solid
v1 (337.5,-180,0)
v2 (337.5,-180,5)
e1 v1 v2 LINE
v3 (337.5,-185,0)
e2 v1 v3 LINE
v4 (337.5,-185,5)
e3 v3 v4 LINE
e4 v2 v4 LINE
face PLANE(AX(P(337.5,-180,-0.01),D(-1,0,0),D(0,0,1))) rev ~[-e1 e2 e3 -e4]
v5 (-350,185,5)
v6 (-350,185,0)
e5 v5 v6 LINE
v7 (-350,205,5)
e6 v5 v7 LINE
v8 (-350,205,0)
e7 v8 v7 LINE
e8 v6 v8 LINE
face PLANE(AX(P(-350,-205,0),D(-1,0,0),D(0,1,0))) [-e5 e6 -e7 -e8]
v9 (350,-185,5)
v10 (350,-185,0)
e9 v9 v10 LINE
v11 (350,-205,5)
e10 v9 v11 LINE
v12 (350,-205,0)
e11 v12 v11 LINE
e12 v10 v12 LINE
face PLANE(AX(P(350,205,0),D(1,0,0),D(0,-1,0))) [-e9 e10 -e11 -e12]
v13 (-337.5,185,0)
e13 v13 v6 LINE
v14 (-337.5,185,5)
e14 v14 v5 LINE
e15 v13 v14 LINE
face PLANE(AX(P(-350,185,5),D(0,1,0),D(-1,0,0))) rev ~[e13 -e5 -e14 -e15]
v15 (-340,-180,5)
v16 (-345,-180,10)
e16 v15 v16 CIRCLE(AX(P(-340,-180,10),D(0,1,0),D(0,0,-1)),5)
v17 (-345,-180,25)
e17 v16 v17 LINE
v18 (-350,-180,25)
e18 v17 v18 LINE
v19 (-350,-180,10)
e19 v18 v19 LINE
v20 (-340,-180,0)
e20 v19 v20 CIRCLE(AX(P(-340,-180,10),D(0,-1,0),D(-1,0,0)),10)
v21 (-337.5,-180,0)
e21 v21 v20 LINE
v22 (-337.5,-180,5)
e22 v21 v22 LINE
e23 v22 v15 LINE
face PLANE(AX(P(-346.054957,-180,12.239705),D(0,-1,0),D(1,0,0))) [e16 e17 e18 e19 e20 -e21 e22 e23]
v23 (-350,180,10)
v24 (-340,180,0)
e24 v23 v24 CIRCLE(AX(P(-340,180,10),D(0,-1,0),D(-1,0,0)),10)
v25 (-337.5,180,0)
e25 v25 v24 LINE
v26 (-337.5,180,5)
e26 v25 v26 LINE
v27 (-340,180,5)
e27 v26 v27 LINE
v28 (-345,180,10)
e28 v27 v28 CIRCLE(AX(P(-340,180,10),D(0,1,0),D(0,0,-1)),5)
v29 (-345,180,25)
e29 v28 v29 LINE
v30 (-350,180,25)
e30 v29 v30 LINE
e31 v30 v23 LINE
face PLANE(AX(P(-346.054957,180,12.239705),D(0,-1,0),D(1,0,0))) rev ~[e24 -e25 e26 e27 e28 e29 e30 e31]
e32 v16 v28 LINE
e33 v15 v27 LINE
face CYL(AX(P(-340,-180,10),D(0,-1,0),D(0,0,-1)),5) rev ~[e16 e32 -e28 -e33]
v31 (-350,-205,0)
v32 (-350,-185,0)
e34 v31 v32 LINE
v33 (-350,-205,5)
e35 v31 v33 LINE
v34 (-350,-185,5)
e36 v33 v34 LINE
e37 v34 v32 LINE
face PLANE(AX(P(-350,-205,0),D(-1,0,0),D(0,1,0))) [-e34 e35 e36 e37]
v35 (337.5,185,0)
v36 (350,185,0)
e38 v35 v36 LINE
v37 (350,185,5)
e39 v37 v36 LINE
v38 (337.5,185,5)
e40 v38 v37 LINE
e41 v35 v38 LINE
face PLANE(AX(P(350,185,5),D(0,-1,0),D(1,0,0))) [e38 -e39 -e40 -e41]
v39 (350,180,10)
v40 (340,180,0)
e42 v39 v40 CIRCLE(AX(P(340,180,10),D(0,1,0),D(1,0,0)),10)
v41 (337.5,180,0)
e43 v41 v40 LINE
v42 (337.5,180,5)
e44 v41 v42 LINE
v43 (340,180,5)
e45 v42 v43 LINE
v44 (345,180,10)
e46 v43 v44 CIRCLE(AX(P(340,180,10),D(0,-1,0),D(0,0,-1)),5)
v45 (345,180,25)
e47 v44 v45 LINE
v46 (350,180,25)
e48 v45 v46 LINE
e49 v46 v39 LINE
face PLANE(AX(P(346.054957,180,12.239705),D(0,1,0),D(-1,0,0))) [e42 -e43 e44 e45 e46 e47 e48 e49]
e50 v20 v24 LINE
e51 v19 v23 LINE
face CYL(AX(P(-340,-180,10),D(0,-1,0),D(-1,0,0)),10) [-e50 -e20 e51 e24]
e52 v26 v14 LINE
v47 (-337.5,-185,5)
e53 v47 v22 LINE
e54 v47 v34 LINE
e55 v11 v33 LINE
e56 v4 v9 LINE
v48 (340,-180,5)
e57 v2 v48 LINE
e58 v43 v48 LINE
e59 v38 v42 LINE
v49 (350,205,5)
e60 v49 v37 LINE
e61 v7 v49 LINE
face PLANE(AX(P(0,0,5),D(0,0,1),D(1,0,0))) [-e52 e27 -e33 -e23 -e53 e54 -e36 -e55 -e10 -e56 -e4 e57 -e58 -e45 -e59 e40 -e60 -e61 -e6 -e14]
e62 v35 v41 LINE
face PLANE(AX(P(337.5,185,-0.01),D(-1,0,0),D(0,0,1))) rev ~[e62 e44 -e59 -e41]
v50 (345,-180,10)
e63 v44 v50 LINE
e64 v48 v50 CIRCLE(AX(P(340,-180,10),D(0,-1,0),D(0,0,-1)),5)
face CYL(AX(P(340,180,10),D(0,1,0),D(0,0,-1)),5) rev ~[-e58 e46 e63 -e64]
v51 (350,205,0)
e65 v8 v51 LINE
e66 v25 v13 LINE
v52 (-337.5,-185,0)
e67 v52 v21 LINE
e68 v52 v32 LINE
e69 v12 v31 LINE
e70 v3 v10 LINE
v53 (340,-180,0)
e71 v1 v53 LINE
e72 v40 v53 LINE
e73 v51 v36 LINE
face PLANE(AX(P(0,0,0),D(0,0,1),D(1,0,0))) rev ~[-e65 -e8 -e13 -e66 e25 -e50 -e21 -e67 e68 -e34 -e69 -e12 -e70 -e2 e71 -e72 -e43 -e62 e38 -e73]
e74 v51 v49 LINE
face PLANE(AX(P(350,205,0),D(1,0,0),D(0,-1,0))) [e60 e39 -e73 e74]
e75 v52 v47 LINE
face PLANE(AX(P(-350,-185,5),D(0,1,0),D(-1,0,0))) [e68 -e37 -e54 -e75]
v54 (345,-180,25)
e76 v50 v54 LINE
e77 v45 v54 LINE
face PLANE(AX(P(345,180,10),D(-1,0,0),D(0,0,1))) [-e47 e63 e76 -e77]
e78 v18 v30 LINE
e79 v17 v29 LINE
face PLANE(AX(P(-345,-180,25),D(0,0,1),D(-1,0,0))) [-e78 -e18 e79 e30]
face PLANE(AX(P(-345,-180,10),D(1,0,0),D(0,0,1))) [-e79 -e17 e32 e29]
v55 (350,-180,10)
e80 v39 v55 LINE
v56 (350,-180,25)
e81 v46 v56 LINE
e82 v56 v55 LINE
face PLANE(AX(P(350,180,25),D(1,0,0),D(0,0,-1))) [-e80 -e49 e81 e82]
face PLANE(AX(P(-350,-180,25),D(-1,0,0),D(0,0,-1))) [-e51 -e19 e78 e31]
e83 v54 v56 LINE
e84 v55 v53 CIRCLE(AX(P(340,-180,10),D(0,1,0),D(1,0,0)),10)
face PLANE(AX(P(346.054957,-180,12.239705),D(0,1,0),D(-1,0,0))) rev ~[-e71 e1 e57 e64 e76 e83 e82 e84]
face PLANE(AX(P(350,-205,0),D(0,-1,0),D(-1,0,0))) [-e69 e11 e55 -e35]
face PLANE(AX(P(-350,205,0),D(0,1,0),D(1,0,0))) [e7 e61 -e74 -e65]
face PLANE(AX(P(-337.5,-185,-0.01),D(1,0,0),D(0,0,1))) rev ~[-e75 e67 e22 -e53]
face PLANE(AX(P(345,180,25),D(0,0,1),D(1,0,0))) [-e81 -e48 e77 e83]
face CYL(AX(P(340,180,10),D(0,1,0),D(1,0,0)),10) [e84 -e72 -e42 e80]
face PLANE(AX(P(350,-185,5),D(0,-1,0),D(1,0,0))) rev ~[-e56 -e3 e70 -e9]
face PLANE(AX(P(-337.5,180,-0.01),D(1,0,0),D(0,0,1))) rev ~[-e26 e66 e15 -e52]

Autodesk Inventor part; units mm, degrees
ref_plane "YZ Plane" through (0, 0, 0) normal (1, 0, 0) x (0, 1, 0)
ref_plane "XZ Plane" through (0, 0, 0) normal (0, 1, 0) x (-1, 0, 0)
ref_plane "XY Plane" through (0, 0, 0) normal (0, 0, 1) x (1, 0, 0)
sketch "Boceto1" plane through (0, 0, 0) normal (0, 0, 1) x (1, 0, 0)
  line L0 (-350, 205) -> (350, 205)
  line L1 (350, 205) -> (350, -205)
  line L2 (350, -205) -> (-350, -205)
  line L3 (-350, -205) -> (-350, 205)
  line L4 (-350, 205) -> (350, -205) construction
  line L5 (350, 205) -> (-350, -205) construction
  point P0 (0, 0)
  dimension "d0" = 700
  dimension "d1" = 410
extrude "Placa1" add sketch "Boceto1" along normal blind 5
sketch "Boceto2" plane through (-345, -205, 0) normal (-1, 0, 0) x (0, -1, 0)
  line L0 (-385, 0) -> (-25, 0)
  line L1 (-25, 0) -> (-25, 25)
  line L2 (-25, 25) -> (-385, 25)
  line L3 (-385, 25) -> (-385, 0)
edge flange "Pestaña1" height 25 angle 90 thickness 5 bend radius 5 thickness toward (-1, 0, 0) relief straight relief width 5 relief depth 2.5 edges at (-350, 0, 5) wall of the first edge with corners at (-345, 180, 0) (-345, -180, 0) (-345, -180, 25) (-345, 180, 25)
bend "Doblez1"
corner "Esquina1"
sketch "Boceto3" plane through (345, 205, 0) normal (1, 0, 0) x (0, 1, 0)
  line L0 (-385, 0) -> (-25, 0)
  line L1 (-25, 0) -> (-25, 25)
  line L2 (-25, 25) -> (-385, 25)
  line L3 (-385, 25) -> (-385, 0)
edge flange "Pestaña2" height 25 angle 90 thickness 5 bend radius 5 thickness toward (1, 0, 0) relief straight relief width 5 relief depth 2.5 edges at (350, 0, 5) wall of the first edge with corners at (345, -180, 0) (345, 180, 0) (345, 180, 25) (345, -180, 25)
bend "Doblez2"
corner "Esquina2"
equation "\"d2\" = Thickness"
equation "\"d3\" = BendReliefWidth"
equation "\"d4\" = BendReliefDepth"
equation "\"d5\" = MinimumRemnant"
equation "\"d6\" = TransitionRadius"
equation "\"d10\" = BendRadius"
equation "\"d11\" = CornerReliefSize"
equation "\"d12\" = GapSize"
equation "\"d13\" = JacobiRadiusSize"
equation "\"d14\" = BendReliefWidth"
equation "\"d15\" = BendReliefDepth"
equation "\"d16\" = MinimumRemnant"
equation "\"d17\" = TransitionRadius"
equation "\"d21\" = BendRadius"
equation "\"d22\" = CornerReliefSize"
equation "\"d23\" = GapSize"
equation "\"d24\" = JacobiRadiusSize"
equation "\"BendRadius\" = Thickness"
equation "\"BendReliefWidth\" = Thickness"
equation "\"BendReliefDepth\" = 0.5 * Thickness"
equation "\"TransitionRadius\" = BendRadius"
equation "\"JacobiRadiusSize\" = BendRadius"
equation "\"GapSize\" = Thickness"
equation "\"Thickness\" = 5"
equation "\"MinimumRemnant\" = 10"
equation "\"CornerReliefSize\" = 20"
properties part number "Fondo"
